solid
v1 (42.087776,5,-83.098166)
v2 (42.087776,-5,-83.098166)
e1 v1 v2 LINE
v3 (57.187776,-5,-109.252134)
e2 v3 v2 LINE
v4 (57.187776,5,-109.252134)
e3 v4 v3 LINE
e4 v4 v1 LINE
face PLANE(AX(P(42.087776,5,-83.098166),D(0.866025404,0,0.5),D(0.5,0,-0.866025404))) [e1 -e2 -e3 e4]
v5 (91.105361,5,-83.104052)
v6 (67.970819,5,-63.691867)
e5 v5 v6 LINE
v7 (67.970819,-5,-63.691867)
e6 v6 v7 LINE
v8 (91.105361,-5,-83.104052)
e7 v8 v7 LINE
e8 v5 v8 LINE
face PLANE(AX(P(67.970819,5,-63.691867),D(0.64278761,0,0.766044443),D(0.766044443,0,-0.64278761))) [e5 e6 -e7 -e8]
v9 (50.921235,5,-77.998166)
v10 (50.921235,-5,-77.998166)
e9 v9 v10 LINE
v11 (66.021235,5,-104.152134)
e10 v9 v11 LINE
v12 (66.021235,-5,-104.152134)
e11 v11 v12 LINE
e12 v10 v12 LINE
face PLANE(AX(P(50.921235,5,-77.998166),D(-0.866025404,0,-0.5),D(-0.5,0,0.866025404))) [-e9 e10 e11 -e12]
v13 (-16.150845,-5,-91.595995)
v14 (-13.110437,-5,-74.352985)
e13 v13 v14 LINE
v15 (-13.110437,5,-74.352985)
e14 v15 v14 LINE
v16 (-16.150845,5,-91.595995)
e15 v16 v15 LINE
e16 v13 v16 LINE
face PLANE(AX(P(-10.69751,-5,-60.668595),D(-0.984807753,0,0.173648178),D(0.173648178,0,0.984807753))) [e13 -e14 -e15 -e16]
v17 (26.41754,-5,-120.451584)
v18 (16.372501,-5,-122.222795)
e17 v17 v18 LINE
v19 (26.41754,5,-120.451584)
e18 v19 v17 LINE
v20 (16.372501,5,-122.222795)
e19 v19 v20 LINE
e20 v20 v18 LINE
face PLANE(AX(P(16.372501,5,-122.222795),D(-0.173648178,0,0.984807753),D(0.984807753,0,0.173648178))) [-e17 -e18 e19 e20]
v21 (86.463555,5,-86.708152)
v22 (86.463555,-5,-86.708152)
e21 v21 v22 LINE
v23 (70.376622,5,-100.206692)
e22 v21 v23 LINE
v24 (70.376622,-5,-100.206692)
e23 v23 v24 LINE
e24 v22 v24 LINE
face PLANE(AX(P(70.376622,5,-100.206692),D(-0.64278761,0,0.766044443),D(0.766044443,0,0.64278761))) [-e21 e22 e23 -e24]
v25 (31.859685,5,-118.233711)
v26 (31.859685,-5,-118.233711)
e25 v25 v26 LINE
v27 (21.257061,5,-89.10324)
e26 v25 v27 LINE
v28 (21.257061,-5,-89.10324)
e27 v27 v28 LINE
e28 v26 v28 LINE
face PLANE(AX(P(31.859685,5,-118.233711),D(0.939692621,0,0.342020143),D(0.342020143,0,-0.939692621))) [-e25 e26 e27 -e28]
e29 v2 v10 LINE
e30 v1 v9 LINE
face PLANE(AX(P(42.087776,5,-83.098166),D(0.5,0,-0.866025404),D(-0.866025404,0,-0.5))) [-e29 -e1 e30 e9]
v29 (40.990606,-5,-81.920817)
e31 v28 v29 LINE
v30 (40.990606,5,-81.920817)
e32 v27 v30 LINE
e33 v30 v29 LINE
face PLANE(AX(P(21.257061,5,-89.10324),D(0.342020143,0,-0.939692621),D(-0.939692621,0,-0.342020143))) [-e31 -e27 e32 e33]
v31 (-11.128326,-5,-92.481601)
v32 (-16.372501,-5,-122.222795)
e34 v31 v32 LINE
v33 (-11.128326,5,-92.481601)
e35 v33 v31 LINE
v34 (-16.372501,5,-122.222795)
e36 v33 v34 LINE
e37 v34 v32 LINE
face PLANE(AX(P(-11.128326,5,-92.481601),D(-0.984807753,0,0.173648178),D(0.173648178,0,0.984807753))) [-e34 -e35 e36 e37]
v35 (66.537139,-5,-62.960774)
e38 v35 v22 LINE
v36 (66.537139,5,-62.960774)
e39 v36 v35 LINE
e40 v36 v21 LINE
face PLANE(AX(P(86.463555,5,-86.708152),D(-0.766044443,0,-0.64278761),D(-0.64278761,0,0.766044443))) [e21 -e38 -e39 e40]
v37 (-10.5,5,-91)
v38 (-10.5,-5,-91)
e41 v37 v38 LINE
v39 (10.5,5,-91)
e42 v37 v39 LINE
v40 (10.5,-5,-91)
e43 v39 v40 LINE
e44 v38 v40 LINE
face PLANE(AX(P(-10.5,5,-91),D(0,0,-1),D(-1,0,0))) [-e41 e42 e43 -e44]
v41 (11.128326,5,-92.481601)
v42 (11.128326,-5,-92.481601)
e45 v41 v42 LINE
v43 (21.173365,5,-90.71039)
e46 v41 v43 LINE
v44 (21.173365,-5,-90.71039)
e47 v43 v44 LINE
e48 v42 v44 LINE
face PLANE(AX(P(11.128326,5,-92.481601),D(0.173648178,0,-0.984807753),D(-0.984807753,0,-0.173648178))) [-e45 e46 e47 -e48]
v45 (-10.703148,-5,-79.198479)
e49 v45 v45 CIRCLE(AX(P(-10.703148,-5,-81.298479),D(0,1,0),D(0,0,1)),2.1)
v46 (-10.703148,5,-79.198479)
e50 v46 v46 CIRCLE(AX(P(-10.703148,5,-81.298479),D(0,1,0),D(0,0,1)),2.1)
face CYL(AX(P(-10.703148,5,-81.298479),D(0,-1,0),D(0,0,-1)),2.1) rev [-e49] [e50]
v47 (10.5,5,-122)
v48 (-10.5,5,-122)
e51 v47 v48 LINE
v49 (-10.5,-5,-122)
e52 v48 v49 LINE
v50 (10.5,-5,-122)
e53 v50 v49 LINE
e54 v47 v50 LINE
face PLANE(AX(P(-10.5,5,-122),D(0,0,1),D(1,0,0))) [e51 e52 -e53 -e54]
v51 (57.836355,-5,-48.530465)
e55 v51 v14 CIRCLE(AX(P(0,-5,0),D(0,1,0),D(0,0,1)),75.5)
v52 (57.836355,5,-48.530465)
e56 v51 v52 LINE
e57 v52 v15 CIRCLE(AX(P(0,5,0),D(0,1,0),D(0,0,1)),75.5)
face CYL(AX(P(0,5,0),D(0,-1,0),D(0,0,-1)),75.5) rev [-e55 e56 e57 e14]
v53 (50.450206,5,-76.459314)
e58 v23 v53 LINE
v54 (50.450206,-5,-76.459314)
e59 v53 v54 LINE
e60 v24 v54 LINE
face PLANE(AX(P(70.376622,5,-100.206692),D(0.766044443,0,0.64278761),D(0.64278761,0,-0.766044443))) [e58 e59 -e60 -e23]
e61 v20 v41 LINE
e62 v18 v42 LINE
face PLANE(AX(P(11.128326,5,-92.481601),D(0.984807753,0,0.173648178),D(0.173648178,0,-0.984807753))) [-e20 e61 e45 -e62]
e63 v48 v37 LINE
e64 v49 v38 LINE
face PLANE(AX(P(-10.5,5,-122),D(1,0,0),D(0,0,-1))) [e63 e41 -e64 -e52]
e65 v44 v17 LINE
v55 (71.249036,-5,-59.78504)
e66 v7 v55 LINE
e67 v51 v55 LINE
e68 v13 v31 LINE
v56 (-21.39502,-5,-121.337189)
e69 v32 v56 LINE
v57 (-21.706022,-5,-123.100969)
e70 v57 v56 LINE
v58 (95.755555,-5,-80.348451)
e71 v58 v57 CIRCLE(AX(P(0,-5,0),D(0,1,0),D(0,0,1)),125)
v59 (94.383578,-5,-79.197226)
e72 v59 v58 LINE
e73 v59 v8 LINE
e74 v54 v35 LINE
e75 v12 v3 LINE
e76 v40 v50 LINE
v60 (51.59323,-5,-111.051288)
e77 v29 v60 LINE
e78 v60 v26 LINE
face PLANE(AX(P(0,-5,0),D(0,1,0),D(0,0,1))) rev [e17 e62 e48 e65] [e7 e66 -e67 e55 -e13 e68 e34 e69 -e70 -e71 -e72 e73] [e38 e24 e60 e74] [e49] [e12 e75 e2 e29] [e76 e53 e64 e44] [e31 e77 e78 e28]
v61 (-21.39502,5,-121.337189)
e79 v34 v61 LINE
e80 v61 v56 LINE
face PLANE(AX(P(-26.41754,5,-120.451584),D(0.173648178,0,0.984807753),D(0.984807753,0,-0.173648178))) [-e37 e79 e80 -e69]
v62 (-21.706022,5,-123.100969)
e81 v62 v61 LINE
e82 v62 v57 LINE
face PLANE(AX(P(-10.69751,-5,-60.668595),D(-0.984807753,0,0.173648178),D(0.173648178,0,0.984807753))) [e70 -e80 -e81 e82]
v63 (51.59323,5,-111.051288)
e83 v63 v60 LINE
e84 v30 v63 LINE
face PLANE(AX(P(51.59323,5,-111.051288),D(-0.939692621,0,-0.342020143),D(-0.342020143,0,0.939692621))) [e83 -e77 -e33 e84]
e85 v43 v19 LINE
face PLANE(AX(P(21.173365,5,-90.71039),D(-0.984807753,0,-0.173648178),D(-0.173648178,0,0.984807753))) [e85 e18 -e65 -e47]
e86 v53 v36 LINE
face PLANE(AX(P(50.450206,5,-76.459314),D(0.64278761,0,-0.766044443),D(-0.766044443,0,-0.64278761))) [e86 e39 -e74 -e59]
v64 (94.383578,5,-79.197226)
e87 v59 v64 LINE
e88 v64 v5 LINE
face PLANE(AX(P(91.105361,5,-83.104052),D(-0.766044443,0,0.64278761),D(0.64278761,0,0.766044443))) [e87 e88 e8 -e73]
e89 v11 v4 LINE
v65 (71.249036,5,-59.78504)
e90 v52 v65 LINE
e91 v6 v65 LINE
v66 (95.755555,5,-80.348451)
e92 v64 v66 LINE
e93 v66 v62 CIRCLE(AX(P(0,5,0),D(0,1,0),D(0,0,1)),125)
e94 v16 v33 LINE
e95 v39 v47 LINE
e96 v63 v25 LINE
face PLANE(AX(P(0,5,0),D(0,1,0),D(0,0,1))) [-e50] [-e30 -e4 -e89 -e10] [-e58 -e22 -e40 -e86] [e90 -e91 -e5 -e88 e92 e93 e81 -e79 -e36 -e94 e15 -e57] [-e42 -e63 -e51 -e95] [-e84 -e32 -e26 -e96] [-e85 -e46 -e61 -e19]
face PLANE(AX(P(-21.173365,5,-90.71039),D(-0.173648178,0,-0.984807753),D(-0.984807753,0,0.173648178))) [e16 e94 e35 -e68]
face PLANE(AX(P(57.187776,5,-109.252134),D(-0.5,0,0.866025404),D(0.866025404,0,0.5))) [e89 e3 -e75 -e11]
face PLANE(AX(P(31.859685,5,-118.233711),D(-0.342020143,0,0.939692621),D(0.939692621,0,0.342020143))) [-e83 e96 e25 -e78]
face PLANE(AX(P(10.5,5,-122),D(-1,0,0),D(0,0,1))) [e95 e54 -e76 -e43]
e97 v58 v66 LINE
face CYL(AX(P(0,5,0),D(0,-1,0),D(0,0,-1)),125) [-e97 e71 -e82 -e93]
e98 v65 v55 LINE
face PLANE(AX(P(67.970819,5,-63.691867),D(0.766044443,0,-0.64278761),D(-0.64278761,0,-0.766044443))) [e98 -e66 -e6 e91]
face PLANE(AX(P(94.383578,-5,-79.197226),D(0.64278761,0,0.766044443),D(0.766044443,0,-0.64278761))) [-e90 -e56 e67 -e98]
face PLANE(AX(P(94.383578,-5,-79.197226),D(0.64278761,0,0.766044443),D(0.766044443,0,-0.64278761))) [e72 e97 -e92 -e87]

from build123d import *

# Parameters (mm, degrees)
BOSS_EXTRUDE1_START       = -5
BOSS_EXTRUDE1_OUTLINE_R   = 125
BOSS_EXTRUDE1_OUTLINE_R_2 = 2.1
BOSS_EXTRUDE1_OUTLINE_W   = 21
BOSS_EXTRUDE1_OUTLINE_H   = 31
BOSS_EXTRUDE1_OUTLINE_W_2 = 30.2
BOSS_EXTRUDE1_OUTLINE_H_2 = 10.2
BOSS_EXTRUDE1_OUTLINE_R_3 = 75.5
BOSS_EXTRUDE1_DEPTH       = 10
SKETCH4_OUTSIDE_W         = 322.738
SKETCH4_OUTSIDE_H         = 322.738
CUT_EXTRUDE1_DEPTH        = 10


# Read off the part's stored shape, not the designer's step: Boss-Extrude1
with BuildPart() as part:
    # Boss-Extrude1 outline → Boss-Extrude1 (new body)
    with BuildSketch(Plane(origin=(0, 0, 0), x_dir=(1, 0, 0), z_dir=(0, 1, 0)).offset(BOSS_EXTRUDE1_START)):
        Circle(BOSS_EXTRUDE1_OUTLINE_R)
        Polygon((-86.463555034, -86.708152159), (-66.537139134, -62.960774422), (-50.450205829, -76.459314226), (-70.376621729, -100.206691962), align=None, mode=Mode.SUBTRACT)
        Polygon((-91.105361481, -83.104052392), (-97.661795099, -75.290399072), (-74.527252917, -55.87821326), (-67.970819298, -63.69186658), align=None, mode=Mode.SUBTRACT)
        Polygon((-51.593230004, -111.051288231), (-40.990605561, -81.920816987), (-21.257060524, -89.103239996), (-31.859684967, -118.233711241), align=None, mode=Mode.SUBTRACT)
        Polygon((-16.372500708, -122.222795071), (-26.417539789, -120.451583659), (-21.173364823, -90.710389518), (-11.128325743, -92.48160093), align=None, mode=Mode.SUBTRACT)
        Polygon((-57.187775987, -109.252133582), (-66.021235106, -104.152133582), (-50.921235106, -77.998166387), (-42.087775987, -83.098166387), align=None, mode=Mode.SUBTRACT)
        Polygon((-114.034295807, -46.932395999), (-117.522901269, -37.347531267), (-89.144184122, -27.018522939), (-85.65557866, -36.603387671), align=None, mode=Mode.SUBTRACT)
        Polygon((-110.905099262, -51.90673326), (-84.058311744, -36.40673326), (-73.558311744, -54.59326674), (-100.405099262, -70.09326674), align=None, mode=Mode.SUBTRACT)
        Polygon((-121.969851733, -10.844596269), (-91.44081139, -5.461502761), (-87.794199659, -26.142465574), (-118.323240002, -31.525559082), align=None, mode=Mode.SUBTRACT)
        with Locations((-81.298478633, -10.703147762)):
            Circle(BOSS_EXTRUDE1_OUTLINE_R_2, mode=Mode.SUBTRACT)
        with Locations((0, -106.5)):
            Rectangle(BOSS_EXTRUDE1_OUTLINE_W, BOSS_EXTRUDE1_OUTLINE_H, mode=Mode.SUBTRACT)
        Polygon((26.417539789, -120.451583659), (16.372500708, -122.222795071), (11.128325743, -92.48160093), (21.173364823, -90.710389518), align=None, mode=Mode.SUBTRACT)
        Polygon((31.859684968, -118.233711241), (21.257060524, -89.103239996), (40.990605561, -81.920816987), (51.593230004, -111.051288231), align=None, mode=Mode.SUBTRACT)
        with Locations((10.703147762, -81.298478633)):
            Circle(BOSS_EXTRUDE1_OUTLINE_R_2, mode=Mode.SUBTRACT)
        Polygon((66.021235106, -104.152133582), (57.187775987, -109.252133582), (42.087775987, -83.098166387), (50.921235106, -77.998166387), align=None, mode=Mode.SUBTRACT)
        Polygon((70.376621729, -100.206691962), (50.450205829, -76.459314226), (66.537139134, -62.960774422), (86.463555035, -86.708152159), align=None, mode=Mode.SUBTRACT)
        Polygon((97.661795099, -75.290399072), (91.105361481, -83.104052392), (67.970819298, -63.69186658), (74.527252917, -55.87821326), align=None, mode=Mode.SUBTRACT)
        Polygon((100.405099262, -70.09326674), (73.558311744, -54.59326674), (84.058311744, -36.40673326), (110.905099262, -51.90673326), align=None, mode=Mode.SUBTRACT)
        Polygon((117.522901269, -37.347531267), (114.034295807, -46.932395999), (85.65557866, -36.603387671), (89.144184122, -27.018522939), align=None, mode=Mode.SUBTRACT)
        Polygon((118.323240002, -31.525559082), (87.794199659, -26.142465574), (91.44081139, -5.461502761), (121.969851733, -10.844596269), align=None, mode=Mode.SUBTRACT)
        with Locations((-108.109011093, 0)):
            Rectangle(BOSS_EXTRUDE1_OUTLINE_W_2, BOSS_EXTRUDE1_OUTLINE_H_2, mode=Mode.SUBTRACT)
        Polygon((-118.323240002, 31.525559082), (-87.794199659, 26.142465574), (-91.44081139, 5.461502761), (-121.969851733, 10.844596269), align=None, mode=Mode.SUBTRACT)
        Polygon((-117.522901269, 37.347531267), (-114.034295807, 46.932395999), (-85.65557866, 36.603387671), (-89.144184122, 27.018522939), align=None, mode=Mode.SUBTRACT)
        Polygon((-100.405099262, 70.09326674), (-73.558311744, 54.59326674), (-84.058311744, 36.40673326), (-110.905099262, 51.90673326), align=None, mode=Mode.SUBTRACT)
        Polygon((-97.661795099, 75.290399072), (-91.105361481, 83.104052392), (-67.970819298, 63.69186658), (-74.527252917, 55.87821326), align=None, mode=Mode.SUBTRACT)
        Polygon((-70.376621729, 100.206691962), (-50.450205829, 76.459314226), (-66.537139134, 62.960774422), (-86.463555035, 86.708152159), align=None, mode=Mode.SUBTRACT)
        Polygon((-66.021235106, 104.152133582), (-57.187775987, 109.252133582), (-42.087775987, 83.098166387), (-50.921235106, 77.998166387), align=None, mode=Mode.SUBTRACT)
        with Locations((-10.703147762, 81.298478633)):
            Circle(BOSS_EXTRUDE1_OUTLINE_R_2, mode=Mode.SUBTRACT)
        Polygon((-31.859684967, 118.233711241), (-21.257060524, 89.103239996), (-40.990605561, 81.920816987), (-51.593230004, 111.051288231), align=None, mode=Mode.SUBTRACT)
        Polygon((-26.417539789, 120.451583659), (-16.372500708, 122.222795071), (-11.128325743, 92.48160093), (-21.173364823, 90.710389518), align=None, mode=Mode.SUBTRACT)
        Circle(BOSS_EXTRUDE1_OUTLINE_R_3, mode=Mode.SUBTRACT)
        with Locations((81.298478633, 10.703147762)):
            Circle(BOSS_EXTRUDE1_OUTLINE_R_2, mode=Mode.SUBTRACT)
        with Locations((108.109011093, 0)):
            Rectangle(BOSS_EXTRUDE1_OUTLINE_W_2, BOSS_EXTRUDE1_OUTLINE_H_2, mode=Mode.SUBTRACT)
        Polygon((121.969851733, 10.844596269), (91.44081139, 5.461502761), (87.794199659, 26.142465574), (118.323240002, 31.525559082), align=None, mode=Mode.SUBTRACT)
        Polygon((110.905099262, 51.90673326), (84.058311744, 36.40673326), (73.558311744, 54.59326674), (100.405099262, 70.09326674), align=None, mode=Mode.SUBTRACT)
        Polygon((114.034295807, 46.932395999), (117.522901269, 37.347531267), (89.144184122, 27.018522939), (85.65557866, 36.603387671), align=None, mode=Mode.SUBTRACT)
        Polygon((57.187775987, 109.252133582), (66.021235106, 104.152133582), (50.921235106, 77.998166387), (42.087775987, 83.098166387), align=None, mode=Mode.SUBTRACT)
        with Locations((0, 106.5)):
            Rectangle(BOSS_EXTRUDE1_OUTLINE_W, BOSS_EXTRUDE1_OUTLINE_H, mode=Mode.SUBTRACT)
        Polygon((16.372500708, 122.222795071), (26.417539789, 120.451583659), (21.173364823, 90.710389518), (11.128325743, 92.48160093), align=None, mode=Mode.SUBTRACT)
        Polygon((51.593230004, 111.051288231), (40.990605561, 81.920816987), (21.257060524, 89.103239996), (31.859684967, 118.233711241), align=None, mode=Mode.SUBTRACT)
        Polygon((91.105361481, 83.104052392), (97.661795099, 75.290399072), (74.527252917, 55.87821326), (67.970819298, 63.69186658), align=None, mode=Mode.SUBTRACT)
        Polygon((86.463555035, 86.708152159), (66.537139134, 62.960774422), (50.450205829, 76.459314226), (70.376621729, 100.206691962), align=None, mode=Mode.SUBTRACT)
    extrude(amount=BOSS_EXTRUDE1_DEPTH)

    # Sketch4 outside → Cut-Extrude1 (cut)
    with BuildSketch(Plane(origin=(0, 5, 0), x_dir=(1, 0, 0), z_dir=(0, 1, 0))):
        Rectangle(SKETCH4_OUTSIDE_W, SKETCH4_OUTSIDE_H)
        with BuildLine():
            Line((-10.697510124, 60.668594683), (-21.395020248, 121.337189365))
            Line((-21.395020248, 121.337189365), (-23.360523909, 132.484114544))
            ThreePointArc((-23.360523909, 132.484114544), (45.824573947, 126.527015659), (101.778053823, 85.401927425))
            Line((101.778053823, 85.401927425), (94.38357829, 79.197225732))
            Line((94.38357829, 79.197225732), (51.307753621, 43.05231714))
            ThreePointArc((51.307753621, 43.05231714), (21.817456639, 57.183528482), (-10.697510124, 60.668594683))
        make_face(mode=Mode.SUBTRACT)
    extrude(amount=-CUT_EXTRUDE1_DEPTH, mode=Mode.SUBTRACT)


solid = part.part
